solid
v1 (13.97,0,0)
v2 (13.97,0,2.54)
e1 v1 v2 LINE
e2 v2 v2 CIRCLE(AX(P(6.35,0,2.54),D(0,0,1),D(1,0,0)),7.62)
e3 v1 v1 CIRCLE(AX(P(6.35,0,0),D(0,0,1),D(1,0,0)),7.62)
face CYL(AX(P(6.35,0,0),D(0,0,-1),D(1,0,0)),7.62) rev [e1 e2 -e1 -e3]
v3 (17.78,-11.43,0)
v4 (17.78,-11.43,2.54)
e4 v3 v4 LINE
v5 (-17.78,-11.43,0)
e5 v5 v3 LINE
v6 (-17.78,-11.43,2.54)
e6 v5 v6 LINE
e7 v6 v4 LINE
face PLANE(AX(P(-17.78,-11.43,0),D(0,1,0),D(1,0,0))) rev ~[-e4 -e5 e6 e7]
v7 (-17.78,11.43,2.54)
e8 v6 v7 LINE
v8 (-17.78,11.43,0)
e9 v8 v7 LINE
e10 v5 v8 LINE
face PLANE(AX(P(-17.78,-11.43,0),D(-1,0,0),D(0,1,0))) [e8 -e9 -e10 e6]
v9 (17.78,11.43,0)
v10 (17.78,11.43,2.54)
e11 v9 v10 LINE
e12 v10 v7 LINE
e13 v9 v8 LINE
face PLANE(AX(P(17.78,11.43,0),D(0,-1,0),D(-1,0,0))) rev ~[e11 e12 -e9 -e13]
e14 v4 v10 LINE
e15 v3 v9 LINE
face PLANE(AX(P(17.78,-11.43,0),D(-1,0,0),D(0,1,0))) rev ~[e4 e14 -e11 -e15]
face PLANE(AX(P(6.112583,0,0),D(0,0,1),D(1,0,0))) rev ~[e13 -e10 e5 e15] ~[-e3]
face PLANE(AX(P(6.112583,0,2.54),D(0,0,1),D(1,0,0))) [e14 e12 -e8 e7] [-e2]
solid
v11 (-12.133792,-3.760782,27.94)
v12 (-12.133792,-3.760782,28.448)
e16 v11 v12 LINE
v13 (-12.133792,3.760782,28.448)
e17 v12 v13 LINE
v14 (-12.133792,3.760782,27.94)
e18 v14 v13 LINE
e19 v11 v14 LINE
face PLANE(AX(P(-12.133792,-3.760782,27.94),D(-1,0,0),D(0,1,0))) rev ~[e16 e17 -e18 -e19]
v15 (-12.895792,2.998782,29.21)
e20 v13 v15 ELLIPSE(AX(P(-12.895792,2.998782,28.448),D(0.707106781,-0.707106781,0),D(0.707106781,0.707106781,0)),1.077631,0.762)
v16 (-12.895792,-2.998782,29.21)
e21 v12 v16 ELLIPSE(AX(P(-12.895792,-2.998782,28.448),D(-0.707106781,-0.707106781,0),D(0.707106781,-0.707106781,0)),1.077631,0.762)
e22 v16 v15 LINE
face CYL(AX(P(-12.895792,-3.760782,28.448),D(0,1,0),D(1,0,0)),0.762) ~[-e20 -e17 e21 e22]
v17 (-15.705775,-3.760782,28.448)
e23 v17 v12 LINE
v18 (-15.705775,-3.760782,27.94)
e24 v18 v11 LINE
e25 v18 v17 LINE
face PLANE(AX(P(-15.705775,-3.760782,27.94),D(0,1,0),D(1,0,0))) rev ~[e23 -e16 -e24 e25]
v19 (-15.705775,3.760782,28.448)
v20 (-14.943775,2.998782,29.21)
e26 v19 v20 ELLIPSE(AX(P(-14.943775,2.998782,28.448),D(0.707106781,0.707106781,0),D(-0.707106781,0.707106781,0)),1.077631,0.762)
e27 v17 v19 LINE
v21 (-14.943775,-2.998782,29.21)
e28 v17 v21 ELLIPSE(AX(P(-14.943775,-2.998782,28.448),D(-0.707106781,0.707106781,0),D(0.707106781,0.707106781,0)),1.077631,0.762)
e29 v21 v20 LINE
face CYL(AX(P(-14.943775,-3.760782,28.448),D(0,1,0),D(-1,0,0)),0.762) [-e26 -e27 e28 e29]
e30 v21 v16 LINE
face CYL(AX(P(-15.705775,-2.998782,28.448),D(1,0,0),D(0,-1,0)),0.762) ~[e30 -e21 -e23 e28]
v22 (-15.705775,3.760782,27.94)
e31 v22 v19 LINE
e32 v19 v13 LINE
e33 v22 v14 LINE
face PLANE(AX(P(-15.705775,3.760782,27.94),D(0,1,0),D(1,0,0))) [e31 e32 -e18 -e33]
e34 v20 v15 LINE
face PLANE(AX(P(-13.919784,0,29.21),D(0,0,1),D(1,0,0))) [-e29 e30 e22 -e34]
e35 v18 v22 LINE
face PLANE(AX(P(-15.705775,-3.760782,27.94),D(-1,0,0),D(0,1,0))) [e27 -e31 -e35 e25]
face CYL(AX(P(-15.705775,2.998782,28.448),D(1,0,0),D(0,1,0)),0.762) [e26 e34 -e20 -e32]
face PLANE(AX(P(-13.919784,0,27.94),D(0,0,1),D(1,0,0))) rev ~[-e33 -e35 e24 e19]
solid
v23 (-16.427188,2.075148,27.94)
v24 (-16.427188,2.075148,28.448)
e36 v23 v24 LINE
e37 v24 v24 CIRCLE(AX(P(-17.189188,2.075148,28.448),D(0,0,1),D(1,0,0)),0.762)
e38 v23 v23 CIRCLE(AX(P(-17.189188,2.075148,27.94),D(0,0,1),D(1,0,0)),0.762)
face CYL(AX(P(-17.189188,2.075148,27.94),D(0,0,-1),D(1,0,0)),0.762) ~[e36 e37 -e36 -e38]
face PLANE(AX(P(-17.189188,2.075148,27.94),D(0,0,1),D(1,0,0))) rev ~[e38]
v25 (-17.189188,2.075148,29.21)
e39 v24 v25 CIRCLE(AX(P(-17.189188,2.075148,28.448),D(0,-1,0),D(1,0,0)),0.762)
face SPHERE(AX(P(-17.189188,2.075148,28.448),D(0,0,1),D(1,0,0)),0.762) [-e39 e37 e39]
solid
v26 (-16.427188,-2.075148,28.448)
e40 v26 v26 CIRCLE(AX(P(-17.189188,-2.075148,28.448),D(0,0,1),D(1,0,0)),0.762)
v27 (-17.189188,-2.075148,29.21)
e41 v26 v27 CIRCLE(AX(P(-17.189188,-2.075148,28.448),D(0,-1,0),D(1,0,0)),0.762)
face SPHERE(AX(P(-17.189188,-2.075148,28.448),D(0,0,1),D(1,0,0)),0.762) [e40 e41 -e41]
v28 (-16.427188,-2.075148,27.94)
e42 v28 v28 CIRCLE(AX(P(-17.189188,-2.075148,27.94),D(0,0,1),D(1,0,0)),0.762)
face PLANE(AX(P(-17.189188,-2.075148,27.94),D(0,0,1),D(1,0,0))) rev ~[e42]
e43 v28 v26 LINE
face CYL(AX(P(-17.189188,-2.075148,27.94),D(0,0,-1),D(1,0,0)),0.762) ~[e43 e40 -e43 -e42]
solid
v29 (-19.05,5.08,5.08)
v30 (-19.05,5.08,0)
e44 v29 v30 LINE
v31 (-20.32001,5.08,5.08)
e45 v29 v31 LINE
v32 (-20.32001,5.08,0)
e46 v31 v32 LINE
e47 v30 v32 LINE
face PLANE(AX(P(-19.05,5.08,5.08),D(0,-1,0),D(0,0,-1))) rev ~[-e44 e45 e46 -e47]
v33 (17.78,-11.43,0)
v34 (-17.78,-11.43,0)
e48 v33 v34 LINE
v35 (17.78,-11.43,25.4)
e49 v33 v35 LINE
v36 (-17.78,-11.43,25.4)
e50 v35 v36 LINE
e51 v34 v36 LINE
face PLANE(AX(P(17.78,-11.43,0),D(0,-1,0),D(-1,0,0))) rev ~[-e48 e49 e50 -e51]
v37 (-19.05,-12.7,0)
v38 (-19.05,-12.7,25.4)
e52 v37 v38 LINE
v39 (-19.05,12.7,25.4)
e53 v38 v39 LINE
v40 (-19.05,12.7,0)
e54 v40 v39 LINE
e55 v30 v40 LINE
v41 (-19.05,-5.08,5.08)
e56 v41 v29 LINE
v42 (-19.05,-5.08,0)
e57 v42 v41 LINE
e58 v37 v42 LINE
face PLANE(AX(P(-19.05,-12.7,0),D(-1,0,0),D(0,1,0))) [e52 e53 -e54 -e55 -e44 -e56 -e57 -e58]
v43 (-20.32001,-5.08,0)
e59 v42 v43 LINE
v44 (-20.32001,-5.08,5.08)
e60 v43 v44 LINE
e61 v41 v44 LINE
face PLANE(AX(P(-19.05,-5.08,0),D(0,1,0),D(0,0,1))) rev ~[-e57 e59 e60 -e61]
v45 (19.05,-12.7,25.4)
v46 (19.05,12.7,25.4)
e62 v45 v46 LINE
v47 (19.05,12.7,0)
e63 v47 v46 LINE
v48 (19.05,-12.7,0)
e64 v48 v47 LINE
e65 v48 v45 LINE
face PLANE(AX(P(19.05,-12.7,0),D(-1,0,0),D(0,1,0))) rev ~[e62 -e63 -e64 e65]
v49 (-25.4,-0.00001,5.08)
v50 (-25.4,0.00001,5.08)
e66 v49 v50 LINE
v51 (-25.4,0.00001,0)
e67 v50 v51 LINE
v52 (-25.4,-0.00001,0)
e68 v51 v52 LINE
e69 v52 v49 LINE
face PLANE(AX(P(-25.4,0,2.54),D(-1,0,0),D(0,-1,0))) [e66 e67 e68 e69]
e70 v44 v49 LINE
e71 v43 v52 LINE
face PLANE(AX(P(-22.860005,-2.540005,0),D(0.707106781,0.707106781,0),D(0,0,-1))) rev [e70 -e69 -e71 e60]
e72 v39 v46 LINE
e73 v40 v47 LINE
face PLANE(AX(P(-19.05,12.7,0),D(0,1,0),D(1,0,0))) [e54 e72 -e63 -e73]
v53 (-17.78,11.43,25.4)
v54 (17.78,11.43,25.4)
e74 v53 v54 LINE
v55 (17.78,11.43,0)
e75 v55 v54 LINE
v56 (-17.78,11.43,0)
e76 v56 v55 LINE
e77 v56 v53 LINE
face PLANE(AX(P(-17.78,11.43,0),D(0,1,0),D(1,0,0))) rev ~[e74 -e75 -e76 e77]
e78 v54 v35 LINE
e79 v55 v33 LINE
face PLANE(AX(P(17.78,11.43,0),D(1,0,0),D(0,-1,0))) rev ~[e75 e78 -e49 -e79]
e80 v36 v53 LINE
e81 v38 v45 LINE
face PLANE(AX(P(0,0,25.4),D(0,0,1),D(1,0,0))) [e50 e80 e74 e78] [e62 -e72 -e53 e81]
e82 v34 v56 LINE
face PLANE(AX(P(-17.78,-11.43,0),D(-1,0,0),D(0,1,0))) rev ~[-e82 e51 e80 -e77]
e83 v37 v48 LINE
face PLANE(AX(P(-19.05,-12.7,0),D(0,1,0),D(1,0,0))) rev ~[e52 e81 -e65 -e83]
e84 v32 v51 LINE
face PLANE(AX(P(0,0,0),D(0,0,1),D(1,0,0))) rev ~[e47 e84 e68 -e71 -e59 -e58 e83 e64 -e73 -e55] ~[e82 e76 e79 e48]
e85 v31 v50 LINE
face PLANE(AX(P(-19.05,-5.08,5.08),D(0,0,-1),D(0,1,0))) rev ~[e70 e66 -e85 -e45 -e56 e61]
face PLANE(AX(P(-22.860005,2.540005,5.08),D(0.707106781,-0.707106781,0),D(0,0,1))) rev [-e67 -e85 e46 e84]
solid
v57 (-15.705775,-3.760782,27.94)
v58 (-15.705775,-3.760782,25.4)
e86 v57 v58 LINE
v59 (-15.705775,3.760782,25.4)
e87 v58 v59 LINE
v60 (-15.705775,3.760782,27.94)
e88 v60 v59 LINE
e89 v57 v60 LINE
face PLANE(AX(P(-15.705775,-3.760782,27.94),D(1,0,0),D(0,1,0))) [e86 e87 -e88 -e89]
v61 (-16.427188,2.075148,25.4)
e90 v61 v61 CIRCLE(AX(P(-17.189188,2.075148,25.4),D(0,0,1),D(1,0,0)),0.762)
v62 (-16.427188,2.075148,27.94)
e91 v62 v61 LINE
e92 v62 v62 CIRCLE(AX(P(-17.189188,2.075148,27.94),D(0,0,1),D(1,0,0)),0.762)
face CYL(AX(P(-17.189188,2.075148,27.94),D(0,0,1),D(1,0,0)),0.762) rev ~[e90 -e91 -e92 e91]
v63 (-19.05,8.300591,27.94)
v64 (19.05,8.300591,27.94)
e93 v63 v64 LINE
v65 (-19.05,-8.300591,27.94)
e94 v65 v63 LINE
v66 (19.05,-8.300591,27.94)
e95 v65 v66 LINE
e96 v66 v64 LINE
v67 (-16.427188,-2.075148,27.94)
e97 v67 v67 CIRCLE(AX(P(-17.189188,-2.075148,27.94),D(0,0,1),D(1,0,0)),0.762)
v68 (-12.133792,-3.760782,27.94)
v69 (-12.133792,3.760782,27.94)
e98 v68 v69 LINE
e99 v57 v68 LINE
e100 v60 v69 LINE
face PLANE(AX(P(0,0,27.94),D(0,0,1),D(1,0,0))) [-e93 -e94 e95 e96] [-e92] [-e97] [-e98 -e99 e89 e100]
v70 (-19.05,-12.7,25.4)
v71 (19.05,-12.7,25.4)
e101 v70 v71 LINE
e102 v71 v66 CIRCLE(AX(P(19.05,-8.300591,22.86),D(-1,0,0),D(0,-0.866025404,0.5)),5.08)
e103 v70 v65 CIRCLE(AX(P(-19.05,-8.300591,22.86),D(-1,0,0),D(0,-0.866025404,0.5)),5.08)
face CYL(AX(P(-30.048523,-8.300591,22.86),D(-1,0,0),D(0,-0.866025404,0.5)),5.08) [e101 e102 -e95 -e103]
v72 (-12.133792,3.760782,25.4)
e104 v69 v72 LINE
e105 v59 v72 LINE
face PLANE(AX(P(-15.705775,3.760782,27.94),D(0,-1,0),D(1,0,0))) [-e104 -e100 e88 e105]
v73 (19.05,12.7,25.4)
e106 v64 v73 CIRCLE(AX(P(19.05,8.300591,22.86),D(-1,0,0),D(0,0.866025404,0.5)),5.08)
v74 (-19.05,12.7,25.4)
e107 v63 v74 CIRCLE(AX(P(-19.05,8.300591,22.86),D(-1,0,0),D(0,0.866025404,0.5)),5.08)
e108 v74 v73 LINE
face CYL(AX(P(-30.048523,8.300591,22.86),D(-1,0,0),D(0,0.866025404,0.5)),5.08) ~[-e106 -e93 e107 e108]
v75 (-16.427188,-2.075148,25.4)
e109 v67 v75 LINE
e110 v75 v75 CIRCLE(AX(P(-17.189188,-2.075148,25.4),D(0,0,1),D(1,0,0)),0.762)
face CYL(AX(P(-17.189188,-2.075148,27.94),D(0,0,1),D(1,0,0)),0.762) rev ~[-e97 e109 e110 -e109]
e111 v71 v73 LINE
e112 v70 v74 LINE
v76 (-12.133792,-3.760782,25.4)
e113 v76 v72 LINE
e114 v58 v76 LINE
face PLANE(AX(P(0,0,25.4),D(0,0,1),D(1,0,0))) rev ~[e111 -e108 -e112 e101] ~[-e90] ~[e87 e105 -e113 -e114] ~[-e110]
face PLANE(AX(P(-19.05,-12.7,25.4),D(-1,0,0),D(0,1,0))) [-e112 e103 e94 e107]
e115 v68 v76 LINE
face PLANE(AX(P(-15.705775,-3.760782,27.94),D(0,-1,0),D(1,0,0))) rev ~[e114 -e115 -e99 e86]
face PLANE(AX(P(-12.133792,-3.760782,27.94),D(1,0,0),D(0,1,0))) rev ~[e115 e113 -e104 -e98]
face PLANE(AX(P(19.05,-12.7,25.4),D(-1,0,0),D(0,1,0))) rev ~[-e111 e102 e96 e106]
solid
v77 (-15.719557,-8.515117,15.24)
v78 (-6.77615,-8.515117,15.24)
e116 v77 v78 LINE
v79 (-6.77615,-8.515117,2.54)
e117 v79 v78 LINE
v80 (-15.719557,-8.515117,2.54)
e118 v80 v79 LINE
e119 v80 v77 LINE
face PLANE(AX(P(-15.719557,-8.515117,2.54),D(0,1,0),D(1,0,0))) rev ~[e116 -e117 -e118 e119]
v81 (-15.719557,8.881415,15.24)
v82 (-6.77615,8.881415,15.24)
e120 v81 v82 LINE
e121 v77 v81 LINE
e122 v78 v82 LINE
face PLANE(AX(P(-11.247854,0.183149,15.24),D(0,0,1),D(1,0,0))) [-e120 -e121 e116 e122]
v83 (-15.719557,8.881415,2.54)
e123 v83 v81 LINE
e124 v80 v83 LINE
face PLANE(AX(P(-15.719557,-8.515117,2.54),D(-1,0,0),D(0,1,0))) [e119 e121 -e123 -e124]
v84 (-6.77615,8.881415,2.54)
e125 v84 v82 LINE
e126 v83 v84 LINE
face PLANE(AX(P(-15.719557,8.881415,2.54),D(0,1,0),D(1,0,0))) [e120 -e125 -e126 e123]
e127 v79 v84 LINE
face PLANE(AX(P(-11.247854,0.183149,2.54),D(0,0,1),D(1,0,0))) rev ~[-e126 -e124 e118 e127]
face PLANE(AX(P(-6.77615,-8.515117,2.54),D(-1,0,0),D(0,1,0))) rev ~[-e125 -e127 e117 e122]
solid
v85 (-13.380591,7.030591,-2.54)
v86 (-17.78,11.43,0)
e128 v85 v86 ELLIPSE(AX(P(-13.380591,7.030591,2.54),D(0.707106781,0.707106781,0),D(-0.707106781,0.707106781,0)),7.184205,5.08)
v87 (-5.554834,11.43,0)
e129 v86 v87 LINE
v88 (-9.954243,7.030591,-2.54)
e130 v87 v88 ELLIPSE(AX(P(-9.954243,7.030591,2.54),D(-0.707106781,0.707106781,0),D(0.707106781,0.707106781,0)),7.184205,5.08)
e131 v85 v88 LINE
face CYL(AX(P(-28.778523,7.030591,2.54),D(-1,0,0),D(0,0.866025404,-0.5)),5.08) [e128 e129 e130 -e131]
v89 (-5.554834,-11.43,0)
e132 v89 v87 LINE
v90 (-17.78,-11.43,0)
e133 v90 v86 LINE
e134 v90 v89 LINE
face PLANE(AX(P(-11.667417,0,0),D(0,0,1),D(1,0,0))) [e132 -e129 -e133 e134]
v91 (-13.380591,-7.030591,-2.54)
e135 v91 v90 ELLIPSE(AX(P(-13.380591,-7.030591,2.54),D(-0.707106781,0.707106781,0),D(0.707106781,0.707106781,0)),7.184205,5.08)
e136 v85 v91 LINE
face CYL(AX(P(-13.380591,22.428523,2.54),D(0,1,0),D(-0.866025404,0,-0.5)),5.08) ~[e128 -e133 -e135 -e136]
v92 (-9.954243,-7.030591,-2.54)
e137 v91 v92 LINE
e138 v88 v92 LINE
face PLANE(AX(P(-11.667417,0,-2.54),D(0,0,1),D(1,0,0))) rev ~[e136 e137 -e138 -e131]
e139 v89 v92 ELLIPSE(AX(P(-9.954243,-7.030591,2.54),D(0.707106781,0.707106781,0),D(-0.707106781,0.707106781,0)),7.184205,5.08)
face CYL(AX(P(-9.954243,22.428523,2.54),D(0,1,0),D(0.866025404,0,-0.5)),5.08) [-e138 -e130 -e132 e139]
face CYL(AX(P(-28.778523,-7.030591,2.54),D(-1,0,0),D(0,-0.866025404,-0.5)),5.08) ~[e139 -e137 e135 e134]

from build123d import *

# Parameters (mm, degrees)
F0_W        = 38.1
F0_H        = 25.4
F1_DEPTH    = 25.4
F0_W_2      = 12.2251660849
F0_H_2      = 22.86
F2_DEPTH    = 2.54
F0_W_3      = 23.3348339151
F0_R        = 7.62
F3_DEPTH    = 2.54
F4_W        = 38.1
F4_H        = 25.4
F5_DEPTH    = 2.54
F6_T1_DEPTH = 44.8570452561
F6_T3_DEPTH = 34.222211341
F7_T1_DEPTH = 60.0970452561
F9_DEPTH    = 6.35
F10_SIZE    = 5.07999
F11_W       = 8.943406865
F11_H       = 17.3965319991
F12_DEPTH   = 12.7
F13_R       = 0.762
F13_W       = 3.5719834268
F13_H       = 7.5215632096
F14_DEPTH   = 2.54
F15_DEPTH   = 1.27
F16_R       = 0.762
F16_2_R     = 0.762
F16_3_R     = 0.762


# Not quite as in the source:
# - a fillet or chamfer that OpenCascade refuses, or shapes differently, is made with other operations: its cross-section is extruded or revolved along the edge and cut away or added
# - a fillet or chamfer is up to 0.001 mm smaller than in the source, because OpenCascade refuses the exact size


with BuildPart() as f1:
    # F0 (on Top) → F1 (new body)
    with BuildSketch(Plane.XY):
        Rectangle(F0_W, F0_H)
        Polygon((-17.78, -11.43), (-17.78, 11.43), (-5.5548339151, 11.43), (17.78, 11.43), (17.78, -11.43), (-5.5548339151, -11.43), align=None, mode=Mode.SUBTRACT)
    extrude(amount=F1_DEPTH)

    # F8 (on face) → F9 (join)
    with BuildSketch(Plane(origin=(-19.05, 0, 0), x_dir=(0, -1, 0), z_dir=(-1, 0, 0))):
        Polygon((-5.08, 0), (0, 0), (5.08, 0), (5.08, 5.08), (0, 5.08), (-5.08, 5.08), align=None)
    extrude(amount=F9_DEPTH)

    # F10 (size 5.08 in the source; OpenCascade refuses exactly that, so slightly less here)
    f10_edges = [f1.edges().sort_by_distance(p)[0] for p in [
        (-25.4, -5.08, 2.54),
        (-25.4, 5.08, 2.54),
    ]]
    chamfer(f10_edges, length=F10_SIZE)


with BuildPart() as f2:
    # F0 (on Top) → F2 (new body)
    with BuildSketch(Plane.XY):
        with Locations((-11.6674169575, 0)):
            Rectangle(F0_W_2, F0_H_2)
    extrude(amount=-F2_DEPTH)

    # F6: fillet of radius 5.08 on 4 edges, made by hand

    # F6_s2 → F6_t1 (cut)
    with BuildSketch(Plane.XZ.offset(-22.4285226281)):
        with BuildLine():
            ThreePointArc((-17.78, 0), (-15.9205909488, -1.8594090512), (-13.3805909488, -2.54))
            Line((-13.3805909488, -2.54), (-17.78, -2.54))
            Line((-17.78, -2.54), (-17.78, 0))
        make_face()
        with BuildLine():
            ThreePointArc((-5.5548339151, 0), (-7.4142429663, -1.8594090512), (-9.9542429663, -2.54))
            Line((-9.9542429663, -2.54), (-5.5548339151, -2.54))
            Line((-5.5548339151, -2.54), (-5.5548339151, 0))
        make_face()
    extrude(amount=F6_T1_DEPTH, mode=Mode.SUBTRACT)

    # F6_s4 → F6_t3 (cut)
    with BuildSketch(Plane.YZ.offset(-28.7785226281)):
        with BuildLine():
            ThreePointArc((-11.43, 0), (-9.5705909488, -1.8594090512), (-7.0305909488, -2.54))
            Line((-7.0305909488, -2.54), (-11.43, -2.54))
            Line((-11.43, -2.54), (-11.43, 0))
        make_face()
        with BuildLine():
            ThreePointArc((11.43, 0), (9.5705909488, -1.8594090512), (7.0305909488, -2.54))
            Line((7.0305909488, -2.54), (11.43, -2.54))
            Line((11.43, -2.54), (11.43, 0))
        make_face()
    extrude(amount=F6_T3_DEPTH, mode=Mode.SUBTRACT)


with BuildPart() as f3:
    # F0 (on Top) → F3 (new body)
    with BuildSketch(Plane.XY):
        with Locations((6.1125830425, 0)):
            Rectangle(F0_W_3, F0_H_2)
        with Locations((6.35, 0)):
            Circle(F0_R, mode=Mode.SUBTRACT)
        with Locations((-11.6674169575, 0)):
            Rectangle(F0_W_2, F0_H_2)
    extrude(amount=F3_DEPTH)


with BuildPart() as f5:
    # F4 (on face) → F5 (new body)
    with BuildSketch(Plane.XY.offset(25.4)):
        Rectangle(F4_W, F4_H)
    extrude(amount=F5_DEPTH)

    # F7: fillet of radius 5.08 on 2 edges, made by hand

    # F7_s2 → F7_t1 (cut)
    with BuildSketch(Plane.YZ.offset(-30.0485226281)):
        with BuildLine():
            ThreePointArc((12.7, 25.4), (10.8405909488, 27.2594090512), (8.3005909488, 27.94))
            Line((8.3005909488, 27.94), (12.7, 27.94))
            Line((12.7, 27.94), (12.7, 25.4))
        make_face()
        with BuildLine():
            ThreePointArc((-12.7, 25.4), (-10.8405909488, 27.2594090512), (-8.3005909488, 27.94))
            Line((-8.3005909488, 27.94), (-12.7, 27.94))
            Line((-12.7, 27.94), (-12.7, 25.4))
        make_face()
    extrude(amount=F7_T1_DEPTH, mode=Mode.SUBTRACT)

    # F13 (on face) → F14 (cut, through all)
    with BuildSketch(Plane.XY.offset(27.94)):
        with Locations((-17.189187929, 2.0751477372)):
            Circle(F13_R)
        with Locations((-17.189187929, -2.0751477372)):
            Circle(F13_R)
        with Locations((-13.9197837561, 0)):
            Rectangle(F13_W, F13_H)
    extrude(amount=-F14_DEPTH, mode=Mode.SUBTRACT)


with BuildPart() as f12:
    # F11 (on face) → F12 (new body)
    with BuildSketch(Plane.XY.offset(2.54)):
        with Locations((-11.2478537485, 0.1831492409)):
            Rectangle(F11_W, F11_H)
    extrude(amount=F12_DEPTH)


with BuildPart() as f15:
    # F13 (on face) → F15 (new body)
    with BuildSketch(Plane.XY.offset(27.94)):
        with Locations((-17.189187929, 2.0751477372)):
            Circle(F13_R)
    extrude(amount=F15_DEPTH)

    # F16
    f16_edges = [f15.edges().sort_by_distance(p)[0] for p in [
        (-17.951188, 2.075148, 29.21),
    ]]
    fillet(f16_edges, radius=F16_R)


with BuildPart() as f15b:
    # F13 (on face) → F15, piece 2 (new body)
    with BuildSketch(Plane.XY.offset(27.94)):
        with Locations((-17.189187929, -2.0751477372)):
            Circle(F13_R)
    extrude(amount=F15_DEPTH)

    # F16#2
    f16_2_edges = [f15b.edges().sort_by_distance(p)[0] for p in [
        (-17.951188, -2.075148, 29.21),
    ]]
    fillet(f16_2_edges, radius=F16_2_R)


with BuildPart() as f15c:
    # F13 (on face) → F15, piece 3 (new body)
    with BuildSketch(Plane.XY.offset(27.94)):
        with Locations((-13.9197837561, 0)):
            Rectangle(F13_W, F13_H)
    extrude(amount=F15_DEPTH)

    # F16#3
    f16_3_edges = [f15c.edges().sort_by_distance(p)[0] for p in [
        (-15.705775, 0, 29.21),
        (-13.919784, -3.760782, 29.21),
        (-12.133792, 0, 29.21),
        (-13.919784, 3.760782, 29.21),
    ]]
    fillet(f16_3_edges, radius=F16_3_R)


solid = Compound([f1.part, f2.part, f3.part, f5.part, f12.part, f15.part, f15b.part, f15c.part])
